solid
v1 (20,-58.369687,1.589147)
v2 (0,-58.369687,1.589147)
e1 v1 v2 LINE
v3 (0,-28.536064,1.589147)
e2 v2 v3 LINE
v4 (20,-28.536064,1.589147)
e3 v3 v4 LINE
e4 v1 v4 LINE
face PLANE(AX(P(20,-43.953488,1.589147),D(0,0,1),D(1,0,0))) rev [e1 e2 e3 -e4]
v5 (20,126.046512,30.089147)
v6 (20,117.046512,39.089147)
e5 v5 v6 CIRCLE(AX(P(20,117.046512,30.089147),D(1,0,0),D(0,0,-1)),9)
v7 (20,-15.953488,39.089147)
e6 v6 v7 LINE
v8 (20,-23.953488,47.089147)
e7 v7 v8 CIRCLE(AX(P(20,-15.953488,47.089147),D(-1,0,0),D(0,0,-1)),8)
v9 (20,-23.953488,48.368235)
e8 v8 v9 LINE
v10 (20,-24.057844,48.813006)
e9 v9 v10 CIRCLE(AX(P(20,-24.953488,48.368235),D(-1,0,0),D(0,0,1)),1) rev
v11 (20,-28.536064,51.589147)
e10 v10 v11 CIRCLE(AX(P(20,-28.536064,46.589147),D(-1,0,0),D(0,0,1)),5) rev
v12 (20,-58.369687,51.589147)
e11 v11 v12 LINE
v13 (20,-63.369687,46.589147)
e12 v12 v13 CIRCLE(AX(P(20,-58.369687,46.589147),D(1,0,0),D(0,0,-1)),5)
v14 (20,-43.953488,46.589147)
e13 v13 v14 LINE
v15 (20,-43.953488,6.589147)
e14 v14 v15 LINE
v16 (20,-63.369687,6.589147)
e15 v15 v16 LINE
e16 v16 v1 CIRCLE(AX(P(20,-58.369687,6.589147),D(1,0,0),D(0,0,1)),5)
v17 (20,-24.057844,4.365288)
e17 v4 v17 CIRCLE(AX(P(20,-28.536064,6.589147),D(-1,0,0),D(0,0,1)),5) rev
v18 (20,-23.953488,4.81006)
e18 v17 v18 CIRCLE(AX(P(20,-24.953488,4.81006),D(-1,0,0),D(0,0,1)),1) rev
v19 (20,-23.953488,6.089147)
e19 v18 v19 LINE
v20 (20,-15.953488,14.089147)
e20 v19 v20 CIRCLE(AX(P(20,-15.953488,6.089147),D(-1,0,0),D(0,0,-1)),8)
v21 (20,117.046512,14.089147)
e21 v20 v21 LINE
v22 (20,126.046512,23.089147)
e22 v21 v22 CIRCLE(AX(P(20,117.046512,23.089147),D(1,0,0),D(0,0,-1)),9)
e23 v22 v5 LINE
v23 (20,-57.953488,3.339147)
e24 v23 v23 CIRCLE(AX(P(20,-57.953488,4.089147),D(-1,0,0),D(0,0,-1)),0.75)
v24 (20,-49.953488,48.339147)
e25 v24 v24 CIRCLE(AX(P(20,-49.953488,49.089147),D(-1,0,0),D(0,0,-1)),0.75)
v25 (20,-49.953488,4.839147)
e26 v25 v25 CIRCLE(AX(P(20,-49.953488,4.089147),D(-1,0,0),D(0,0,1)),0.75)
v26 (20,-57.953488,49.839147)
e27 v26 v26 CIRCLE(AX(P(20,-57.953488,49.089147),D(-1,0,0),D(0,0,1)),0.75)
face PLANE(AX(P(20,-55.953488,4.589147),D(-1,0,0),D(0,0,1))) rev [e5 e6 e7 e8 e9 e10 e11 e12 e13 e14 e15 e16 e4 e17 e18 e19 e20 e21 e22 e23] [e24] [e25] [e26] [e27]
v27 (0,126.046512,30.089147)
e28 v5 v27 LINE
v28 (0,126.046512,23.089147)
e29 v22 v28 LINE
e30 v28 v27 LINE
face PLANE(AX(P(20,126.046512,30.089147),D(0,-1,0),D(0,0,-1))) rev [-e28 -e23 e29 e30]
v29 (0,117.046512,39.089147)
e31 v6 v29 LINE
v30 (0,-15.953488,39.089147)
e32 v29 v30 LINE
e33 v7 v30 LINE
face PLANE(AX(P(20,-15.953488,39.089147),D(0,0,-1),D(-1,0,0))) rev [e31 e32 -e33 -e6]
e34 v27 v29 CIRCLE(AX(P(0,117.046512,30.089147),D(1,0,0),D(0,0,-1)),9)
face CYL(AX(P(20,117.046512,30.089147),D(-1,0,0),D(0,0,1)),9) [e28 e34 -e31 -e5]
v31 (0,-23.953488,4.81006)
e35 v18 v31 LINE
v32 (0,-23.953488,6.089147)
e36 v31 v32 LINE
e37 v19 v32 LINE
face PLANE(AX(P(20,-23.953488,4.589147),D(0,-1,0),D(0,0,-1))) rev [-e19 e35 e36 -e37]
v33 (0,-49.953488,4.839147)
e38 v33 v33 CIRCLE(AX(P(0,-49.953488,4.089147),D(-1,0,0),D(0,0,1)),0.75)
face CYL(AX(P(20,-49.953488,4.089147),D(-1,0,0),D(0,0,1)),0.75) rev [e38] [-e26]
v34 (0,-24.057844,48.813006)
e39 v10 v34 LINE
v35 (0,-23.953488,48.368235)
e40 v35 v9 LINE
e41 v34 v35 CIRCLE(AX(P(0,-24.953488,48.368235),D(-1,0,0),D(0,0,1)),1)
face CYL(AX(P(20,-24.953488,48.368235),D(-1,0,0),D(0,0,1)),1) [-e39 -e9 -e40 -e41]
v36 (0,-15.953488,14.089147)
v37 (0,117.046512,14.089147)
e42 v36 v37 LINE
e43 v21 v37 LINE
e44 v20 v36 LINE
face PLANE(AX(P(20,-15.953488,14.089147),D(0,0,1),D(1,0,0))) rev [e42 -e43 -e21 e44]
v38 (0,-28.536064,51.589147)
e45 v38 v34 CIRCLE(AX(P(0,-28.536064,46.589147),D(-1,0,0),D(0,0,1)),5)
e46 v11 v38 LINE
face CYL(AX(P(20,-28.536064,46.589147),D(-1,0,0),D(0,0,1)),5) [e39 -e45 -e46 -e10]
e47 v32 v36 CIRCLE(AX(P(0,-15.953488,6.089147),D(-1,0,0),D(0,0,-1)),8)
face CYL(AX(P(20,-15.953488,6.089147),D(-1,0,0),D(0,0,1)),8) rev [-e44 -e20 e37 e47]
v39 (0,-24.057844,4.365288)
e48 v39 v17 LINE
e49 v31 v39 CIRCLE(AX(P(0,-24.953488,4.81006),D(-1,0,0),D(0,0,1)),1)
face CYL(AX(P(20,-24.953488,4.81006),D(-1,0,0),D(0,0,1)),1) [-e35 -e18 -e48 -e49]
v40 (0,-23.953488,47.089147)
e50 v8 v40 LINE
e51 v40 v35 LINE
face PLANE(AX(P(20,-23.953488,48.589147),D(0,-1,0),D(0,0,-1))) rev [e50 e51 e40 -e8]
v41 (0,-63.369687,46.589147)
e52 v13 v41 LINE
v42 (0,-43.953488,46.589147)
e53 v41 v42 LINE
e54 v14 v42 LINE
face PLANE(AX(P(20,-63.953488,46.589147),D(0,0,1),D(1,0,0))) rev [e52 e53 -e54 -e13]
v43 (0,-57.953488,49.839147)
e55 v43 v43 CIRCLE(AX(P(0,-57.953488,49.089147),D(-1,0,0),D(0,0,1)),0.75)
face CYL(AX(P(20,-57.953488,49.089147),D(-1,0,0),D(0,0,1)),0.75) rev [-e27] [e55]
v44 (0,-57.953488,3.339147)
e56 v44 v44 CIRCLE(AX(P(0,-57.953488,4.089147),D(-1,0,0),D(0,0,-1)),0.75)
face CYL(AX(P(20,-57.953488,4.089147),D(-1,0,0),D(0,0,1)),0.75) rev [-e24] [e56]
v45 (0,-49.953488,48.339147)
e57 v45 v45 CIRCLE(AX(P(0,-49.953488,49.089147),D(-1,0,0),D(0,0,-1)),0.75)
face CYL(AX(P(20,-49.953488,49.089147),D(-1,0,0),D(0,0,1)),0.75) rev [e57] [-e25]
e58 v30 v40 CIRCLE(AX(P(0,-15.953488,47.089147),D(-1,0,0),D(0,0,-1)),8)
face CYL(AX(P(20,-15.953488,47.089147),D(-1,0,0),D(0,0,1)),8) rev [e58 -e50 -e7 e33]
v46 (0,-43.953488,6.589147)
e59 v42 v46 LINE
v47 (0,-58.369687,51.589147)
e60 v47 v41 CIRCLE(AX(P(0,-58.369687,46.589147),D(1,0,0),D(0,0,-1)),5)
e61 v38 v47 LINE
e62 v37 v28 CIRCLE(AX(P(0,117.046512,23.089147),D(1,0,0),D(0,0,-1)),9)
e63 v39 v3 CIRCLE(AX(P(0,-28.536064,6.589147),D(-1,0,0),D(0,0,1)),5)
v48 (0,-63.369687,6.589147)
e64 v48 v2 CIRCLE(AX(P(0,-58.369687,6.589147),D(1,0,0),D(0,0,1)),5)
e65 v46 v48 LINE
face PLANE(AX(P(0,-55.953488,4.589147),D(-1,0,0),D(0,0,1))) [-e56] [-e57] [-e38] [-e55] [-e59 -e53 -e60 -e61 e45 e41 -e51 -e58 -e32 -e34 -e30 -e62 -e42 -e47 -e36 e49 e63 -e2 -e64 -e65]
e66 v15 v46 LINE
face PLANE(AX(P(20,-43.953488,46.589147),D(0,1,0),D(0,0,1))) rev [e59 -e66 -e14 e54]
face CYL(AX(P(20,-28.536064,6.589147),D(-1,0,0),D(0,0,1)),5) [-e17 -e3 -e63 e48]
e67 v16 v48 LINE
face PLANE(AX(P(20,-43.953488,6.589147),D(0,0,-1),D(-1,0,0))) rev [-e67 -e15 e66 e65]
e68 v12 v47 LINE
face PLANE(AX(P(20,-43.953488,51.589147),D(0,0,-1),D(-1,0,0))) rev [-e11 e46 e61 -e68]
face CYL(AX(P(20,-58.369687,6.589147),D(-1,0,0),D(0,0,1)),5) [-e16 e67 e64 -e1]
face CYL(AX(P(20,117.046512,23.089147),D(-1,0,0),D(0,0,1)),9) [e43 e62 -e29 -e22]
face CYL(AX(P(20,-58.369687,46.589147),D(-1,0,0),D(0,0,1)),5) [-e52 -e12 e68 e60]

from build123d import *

# Parameters (mm, degrees)
BOSS_EXTRUDE1_DEPTH = 20
SKETCH2_R           = 0.75
CUT_EXTRUDE1_DEPTH  = 140.606785953
CUT_EXTRUDE2_DEPTH  = 140.606785953
FILLET1_R           = 5
FILLET2_R           = 1
FILLET3_R           = 5
FILLET4_R           = 1
SKETCH4_W           = 19.881917645
SKETCH4_H           = 22.757656903
CUT_EXTRUDE3_DEPTH  = 140.606786098
FILLET5_R           = 5
FILLET6_R           = 1
FILLET7_R           = 5
FILLET8_R           = 1


# Some blends are built 0.0001 mm under size
with BuildPart() as part:
    # Sketch1 → Boss-Extrude1 (new body)
    with BuildSketch(Plane(origin=(0, 0, 0), x_dir=(0, 0, -1), z_dir=(1, 0, 0))):
        with BuildLine():
            Line((-39.089147287, -15.953488372), (-39.089147287, 117.046511628))
            ThreePointArc((-39.089147287, 117.046511628), (-36.453108318, 123.410472659), (-30.089147287, 126.046511628))
            Line((-30.089147287, 126.046511628), (-23.089147287, 126.046511628))
            ThreePointArc((-23.089147287, 126.046511628), (-16.725186256, 123.410472659), (-14.089147287, 117.046511628))
            Line((-14.089147287, 117.046511628), (-14.089147287, -15.953488372))
            ThreePointArc((-14.089147287, -15.953488372), (-11.746001536, -21.610342622), (-6.089147287, -23.953488372))
            Line((-6.089147287, -23.953488372), (-4.589147287, -23.953488372))
            ThreePointArc((-4.589147287, -23.953488372), (1.067706963, -26.296634123), (3.410852713, -31.953488372))
            Line((3.410852713, -31.953488372), (3.410852713, -55.953488372))
            ThreePointArc((3.410852713, -55.953488372), (1.067706963, -61.610342622), (-4.589147287, -63.953488372))
            Line((-4.589147287, -63.953488372), (-6.589147287, -63.953488372))
            Line((-6.589147287, -63.953488372), (-6.589147287, -43.953488372))
            Line((-6.589147287, -43.953488372), (-46.589147287, -43.953488372))
            Line((-46.589147287, -43.953488372), (-46.589147287, -63.953488372))
            Line((-46.589147287, -63.953488372), (-48.589147287, -63.953488372))
            ThreePointArc((-48.589147287, -63.953488372), (-54.246001536, -61.610342622), (-56.589147287, -55.953488372))
            Line((-56.589147287, -55.953488372), (-56.589147287, -31.953488372))
            ThreePointArc((-56.589147287, -31.953488372), (-54.246001536, -26.296634123), (-48.589147287, -23.953488372))
            Line((-48.589147287, -23.953488372), (-47.089147287, -23.953488372))
            ThreePointArc((-47.089147287, -23.953488372), (-41.432293037, -21.610342622), (-39.089147287, -15.953488372))
        make_face()
    extrude(amount=BOSS_EXTRUDE1_DEPTH)

    # Sketch2 → Cut-Extrude1 (cut, through all)
    with BuildSketch(Plane.ZY):
        with Locations((4.089147287, -49.953488372)):
            Circle(SKETCH2_R)
        with Locations(Location((4.089147287, -57.953488372, 0), (0, 0, 180))):
            Circle(SKETCH2_R)
        with Locations((49.089147287, -57.953488372)):
            Circle(SKETCH2_R)
        with Locations(Location((49.089147287, -49.953488372, 0), (0, 0, 180))):
            Circle(SKETCH2_R)
    extrude(amount=-CUT_EXTRUDE1_DEPTH, mode=Mode.SUBTRACT)

    # Sketch3 → Cut-Extrude2 (cut, through all)
    with BuildSketch(Plane.ZY):
        with BuildLine():
            Line((1.589147287, -43.953488372), (-3.410852713, -43.953488372))
            Line((-3.410852713, -43.953488372), (-12.995571428, -43.953488372))
            Line((-12.995571428, -43.953488372), (-12.995571428, -71.298292192))
            Line((-12.995571428, -71.298292192), (6.589147287, -71.298292192))
            Line((6.589147287, -71.298292192), (6.589147287, -63.369686859))
            ThreePointArc((6.589147287, -63.369686859), (3.053613381, -61.905220765), (1.589147287, -58.369686859))
            Line((1.589147287, -58.369686859), (1.589147287, -43.953488372))
        make_face()
        with BuildLine():
            Line((46.589147287, -63.369686859), (46.589147287, -71.298292192))
            Line((46.589147287, -71.298292192), (65.185710821, -71.298292192))
            Line((65.185710821, -71.298292192), (65.185710821, -43.953488372))
            Line((65.185710821, -43.953488372), (56.589147287, -43.953488372))
            Line((56.589147287, -43.953488372), (51.589147287, -43.953488372))
            Line((51.589147287, -43.953488372), (51.589147287, -58.369686859))
            ThreePointArc((51.589147287, -58.369686859), (50.124681193, -61.905220765), (46.589147287, -63.369686859))
        make_face()
    extrude(amount=-CUT_EXTRUDE2_DEPTH, mode=Mode.SUBTRACT)

    # Fillet1
    fillet1_edges = [part.edges().sort_by_distance(p)[0] for p in [
        (10, -43.953488372, -3.410852713),
    ]]
    fillet(fillet1_edges, radius=FILLET1_R - 0.0001)  # a hair under: the kernel refuses the full size

    # Fillet2
    fillet2_edges = [part.edges().sort_by_distance(p)[0] for p in [
        (10, -43.953488372, 1.589147287),
    ]]
    fillet(fillet2_edges, radius=FILLET2_R)

    # Fillet3
    fillet3_edges = [part.edges().sort_by_distance(p)[0] for p in [
        (10, -43.953488372, 56.589147287),
    ]]
    fillet(fillet3_edges, radius=FILLET3_R - 0.0001)  # a hair under: the kernel refuses the full size

    # Fillet4
    fillet4_edges = [part.edges().sort_by_distance(p)[0] for p in [
        (10, -43.953488372, 51.589147287),
    ]]
    fillet(fillet4_edges, radius=FILLET4_R)

    # Sketch4 → Cut-Extrude3 (cut, through all)
    with BuildSketch(Plane.ZY):
        with Locations((-8.351811536, -35.916118337)):
            Rectangle(SKETCH4_W, SKETCH4_H)
        Polygon((51.589147287, -47.294946788), (51.589147287, -22.319102336), (73.994526012, -22.319102336), (73.994526012, -45.973763973), align=None)
    extrude(amount=-CUT_EXTRUDE3_DEPTH, mode=Mode.SUBTRACT)

    # Fillet5
    # the kernel refuses this fillet: 5 mm, written as the material it takes off along each edge
    with BuildSketch(Plane(origin=(-9.996935455, -24.537289885, 1.589147287), x_dir=(0, -1, 0), z_dir=(1, 0, 0))) as fillet5_piece_1:
        with BuildLine():
            CenterArc((3.998774182, -5), FILLET5_R, 90, 66.421821522)
            ThreePointArc((-0.583801513, -3), (-0.436494933, -1.4718619), (0, 0))
            Line((0, 0), (3.998774182, 0))
        make_face()
    extrude(amount=39.99387091, mode=Mode.SUBTRACT)

    # Fillet6
    fillet6_edges = [part.edges().sort_by_distance(p)[0] for p in [
        (10, -23.953488372, 4.589147287),
    ]]
    fillet(fillet6_edges, radius=FILLET6_R)

    # Fillet7
    # the kernel refuses this fillet: 5 mm, written as the material it takes off along each edge
    with BuildSketch(Plane(origin=(29.996935455, -24.537289885, 51.589147287), x_dir=(0, -1, 0), z_dir=(-1, 0, 0))) as fillet7_piece_1:
        with BuildLine():
            CenterArc((3.998774182, -5), FILLET7_R, 90, 66.421821522)
            ThreePointArc((-0.583801513, -3), (-0.436494933, -1.4718619), (0, 0))
            Line((0, 0), (3.998774182, 0))
        make_face()
    extrude(amount=39.99387091, mode=Mode.SUBTRACT)

    # Fillet8
    fillet8_edges = [part.edges().sort_by_distance(p)[0] for p in [
        (10, -23.953488372, 48.589147287),
    ]]
    fillet(fillet8_edges, radius=FILLET8_R)


solid = part.part
